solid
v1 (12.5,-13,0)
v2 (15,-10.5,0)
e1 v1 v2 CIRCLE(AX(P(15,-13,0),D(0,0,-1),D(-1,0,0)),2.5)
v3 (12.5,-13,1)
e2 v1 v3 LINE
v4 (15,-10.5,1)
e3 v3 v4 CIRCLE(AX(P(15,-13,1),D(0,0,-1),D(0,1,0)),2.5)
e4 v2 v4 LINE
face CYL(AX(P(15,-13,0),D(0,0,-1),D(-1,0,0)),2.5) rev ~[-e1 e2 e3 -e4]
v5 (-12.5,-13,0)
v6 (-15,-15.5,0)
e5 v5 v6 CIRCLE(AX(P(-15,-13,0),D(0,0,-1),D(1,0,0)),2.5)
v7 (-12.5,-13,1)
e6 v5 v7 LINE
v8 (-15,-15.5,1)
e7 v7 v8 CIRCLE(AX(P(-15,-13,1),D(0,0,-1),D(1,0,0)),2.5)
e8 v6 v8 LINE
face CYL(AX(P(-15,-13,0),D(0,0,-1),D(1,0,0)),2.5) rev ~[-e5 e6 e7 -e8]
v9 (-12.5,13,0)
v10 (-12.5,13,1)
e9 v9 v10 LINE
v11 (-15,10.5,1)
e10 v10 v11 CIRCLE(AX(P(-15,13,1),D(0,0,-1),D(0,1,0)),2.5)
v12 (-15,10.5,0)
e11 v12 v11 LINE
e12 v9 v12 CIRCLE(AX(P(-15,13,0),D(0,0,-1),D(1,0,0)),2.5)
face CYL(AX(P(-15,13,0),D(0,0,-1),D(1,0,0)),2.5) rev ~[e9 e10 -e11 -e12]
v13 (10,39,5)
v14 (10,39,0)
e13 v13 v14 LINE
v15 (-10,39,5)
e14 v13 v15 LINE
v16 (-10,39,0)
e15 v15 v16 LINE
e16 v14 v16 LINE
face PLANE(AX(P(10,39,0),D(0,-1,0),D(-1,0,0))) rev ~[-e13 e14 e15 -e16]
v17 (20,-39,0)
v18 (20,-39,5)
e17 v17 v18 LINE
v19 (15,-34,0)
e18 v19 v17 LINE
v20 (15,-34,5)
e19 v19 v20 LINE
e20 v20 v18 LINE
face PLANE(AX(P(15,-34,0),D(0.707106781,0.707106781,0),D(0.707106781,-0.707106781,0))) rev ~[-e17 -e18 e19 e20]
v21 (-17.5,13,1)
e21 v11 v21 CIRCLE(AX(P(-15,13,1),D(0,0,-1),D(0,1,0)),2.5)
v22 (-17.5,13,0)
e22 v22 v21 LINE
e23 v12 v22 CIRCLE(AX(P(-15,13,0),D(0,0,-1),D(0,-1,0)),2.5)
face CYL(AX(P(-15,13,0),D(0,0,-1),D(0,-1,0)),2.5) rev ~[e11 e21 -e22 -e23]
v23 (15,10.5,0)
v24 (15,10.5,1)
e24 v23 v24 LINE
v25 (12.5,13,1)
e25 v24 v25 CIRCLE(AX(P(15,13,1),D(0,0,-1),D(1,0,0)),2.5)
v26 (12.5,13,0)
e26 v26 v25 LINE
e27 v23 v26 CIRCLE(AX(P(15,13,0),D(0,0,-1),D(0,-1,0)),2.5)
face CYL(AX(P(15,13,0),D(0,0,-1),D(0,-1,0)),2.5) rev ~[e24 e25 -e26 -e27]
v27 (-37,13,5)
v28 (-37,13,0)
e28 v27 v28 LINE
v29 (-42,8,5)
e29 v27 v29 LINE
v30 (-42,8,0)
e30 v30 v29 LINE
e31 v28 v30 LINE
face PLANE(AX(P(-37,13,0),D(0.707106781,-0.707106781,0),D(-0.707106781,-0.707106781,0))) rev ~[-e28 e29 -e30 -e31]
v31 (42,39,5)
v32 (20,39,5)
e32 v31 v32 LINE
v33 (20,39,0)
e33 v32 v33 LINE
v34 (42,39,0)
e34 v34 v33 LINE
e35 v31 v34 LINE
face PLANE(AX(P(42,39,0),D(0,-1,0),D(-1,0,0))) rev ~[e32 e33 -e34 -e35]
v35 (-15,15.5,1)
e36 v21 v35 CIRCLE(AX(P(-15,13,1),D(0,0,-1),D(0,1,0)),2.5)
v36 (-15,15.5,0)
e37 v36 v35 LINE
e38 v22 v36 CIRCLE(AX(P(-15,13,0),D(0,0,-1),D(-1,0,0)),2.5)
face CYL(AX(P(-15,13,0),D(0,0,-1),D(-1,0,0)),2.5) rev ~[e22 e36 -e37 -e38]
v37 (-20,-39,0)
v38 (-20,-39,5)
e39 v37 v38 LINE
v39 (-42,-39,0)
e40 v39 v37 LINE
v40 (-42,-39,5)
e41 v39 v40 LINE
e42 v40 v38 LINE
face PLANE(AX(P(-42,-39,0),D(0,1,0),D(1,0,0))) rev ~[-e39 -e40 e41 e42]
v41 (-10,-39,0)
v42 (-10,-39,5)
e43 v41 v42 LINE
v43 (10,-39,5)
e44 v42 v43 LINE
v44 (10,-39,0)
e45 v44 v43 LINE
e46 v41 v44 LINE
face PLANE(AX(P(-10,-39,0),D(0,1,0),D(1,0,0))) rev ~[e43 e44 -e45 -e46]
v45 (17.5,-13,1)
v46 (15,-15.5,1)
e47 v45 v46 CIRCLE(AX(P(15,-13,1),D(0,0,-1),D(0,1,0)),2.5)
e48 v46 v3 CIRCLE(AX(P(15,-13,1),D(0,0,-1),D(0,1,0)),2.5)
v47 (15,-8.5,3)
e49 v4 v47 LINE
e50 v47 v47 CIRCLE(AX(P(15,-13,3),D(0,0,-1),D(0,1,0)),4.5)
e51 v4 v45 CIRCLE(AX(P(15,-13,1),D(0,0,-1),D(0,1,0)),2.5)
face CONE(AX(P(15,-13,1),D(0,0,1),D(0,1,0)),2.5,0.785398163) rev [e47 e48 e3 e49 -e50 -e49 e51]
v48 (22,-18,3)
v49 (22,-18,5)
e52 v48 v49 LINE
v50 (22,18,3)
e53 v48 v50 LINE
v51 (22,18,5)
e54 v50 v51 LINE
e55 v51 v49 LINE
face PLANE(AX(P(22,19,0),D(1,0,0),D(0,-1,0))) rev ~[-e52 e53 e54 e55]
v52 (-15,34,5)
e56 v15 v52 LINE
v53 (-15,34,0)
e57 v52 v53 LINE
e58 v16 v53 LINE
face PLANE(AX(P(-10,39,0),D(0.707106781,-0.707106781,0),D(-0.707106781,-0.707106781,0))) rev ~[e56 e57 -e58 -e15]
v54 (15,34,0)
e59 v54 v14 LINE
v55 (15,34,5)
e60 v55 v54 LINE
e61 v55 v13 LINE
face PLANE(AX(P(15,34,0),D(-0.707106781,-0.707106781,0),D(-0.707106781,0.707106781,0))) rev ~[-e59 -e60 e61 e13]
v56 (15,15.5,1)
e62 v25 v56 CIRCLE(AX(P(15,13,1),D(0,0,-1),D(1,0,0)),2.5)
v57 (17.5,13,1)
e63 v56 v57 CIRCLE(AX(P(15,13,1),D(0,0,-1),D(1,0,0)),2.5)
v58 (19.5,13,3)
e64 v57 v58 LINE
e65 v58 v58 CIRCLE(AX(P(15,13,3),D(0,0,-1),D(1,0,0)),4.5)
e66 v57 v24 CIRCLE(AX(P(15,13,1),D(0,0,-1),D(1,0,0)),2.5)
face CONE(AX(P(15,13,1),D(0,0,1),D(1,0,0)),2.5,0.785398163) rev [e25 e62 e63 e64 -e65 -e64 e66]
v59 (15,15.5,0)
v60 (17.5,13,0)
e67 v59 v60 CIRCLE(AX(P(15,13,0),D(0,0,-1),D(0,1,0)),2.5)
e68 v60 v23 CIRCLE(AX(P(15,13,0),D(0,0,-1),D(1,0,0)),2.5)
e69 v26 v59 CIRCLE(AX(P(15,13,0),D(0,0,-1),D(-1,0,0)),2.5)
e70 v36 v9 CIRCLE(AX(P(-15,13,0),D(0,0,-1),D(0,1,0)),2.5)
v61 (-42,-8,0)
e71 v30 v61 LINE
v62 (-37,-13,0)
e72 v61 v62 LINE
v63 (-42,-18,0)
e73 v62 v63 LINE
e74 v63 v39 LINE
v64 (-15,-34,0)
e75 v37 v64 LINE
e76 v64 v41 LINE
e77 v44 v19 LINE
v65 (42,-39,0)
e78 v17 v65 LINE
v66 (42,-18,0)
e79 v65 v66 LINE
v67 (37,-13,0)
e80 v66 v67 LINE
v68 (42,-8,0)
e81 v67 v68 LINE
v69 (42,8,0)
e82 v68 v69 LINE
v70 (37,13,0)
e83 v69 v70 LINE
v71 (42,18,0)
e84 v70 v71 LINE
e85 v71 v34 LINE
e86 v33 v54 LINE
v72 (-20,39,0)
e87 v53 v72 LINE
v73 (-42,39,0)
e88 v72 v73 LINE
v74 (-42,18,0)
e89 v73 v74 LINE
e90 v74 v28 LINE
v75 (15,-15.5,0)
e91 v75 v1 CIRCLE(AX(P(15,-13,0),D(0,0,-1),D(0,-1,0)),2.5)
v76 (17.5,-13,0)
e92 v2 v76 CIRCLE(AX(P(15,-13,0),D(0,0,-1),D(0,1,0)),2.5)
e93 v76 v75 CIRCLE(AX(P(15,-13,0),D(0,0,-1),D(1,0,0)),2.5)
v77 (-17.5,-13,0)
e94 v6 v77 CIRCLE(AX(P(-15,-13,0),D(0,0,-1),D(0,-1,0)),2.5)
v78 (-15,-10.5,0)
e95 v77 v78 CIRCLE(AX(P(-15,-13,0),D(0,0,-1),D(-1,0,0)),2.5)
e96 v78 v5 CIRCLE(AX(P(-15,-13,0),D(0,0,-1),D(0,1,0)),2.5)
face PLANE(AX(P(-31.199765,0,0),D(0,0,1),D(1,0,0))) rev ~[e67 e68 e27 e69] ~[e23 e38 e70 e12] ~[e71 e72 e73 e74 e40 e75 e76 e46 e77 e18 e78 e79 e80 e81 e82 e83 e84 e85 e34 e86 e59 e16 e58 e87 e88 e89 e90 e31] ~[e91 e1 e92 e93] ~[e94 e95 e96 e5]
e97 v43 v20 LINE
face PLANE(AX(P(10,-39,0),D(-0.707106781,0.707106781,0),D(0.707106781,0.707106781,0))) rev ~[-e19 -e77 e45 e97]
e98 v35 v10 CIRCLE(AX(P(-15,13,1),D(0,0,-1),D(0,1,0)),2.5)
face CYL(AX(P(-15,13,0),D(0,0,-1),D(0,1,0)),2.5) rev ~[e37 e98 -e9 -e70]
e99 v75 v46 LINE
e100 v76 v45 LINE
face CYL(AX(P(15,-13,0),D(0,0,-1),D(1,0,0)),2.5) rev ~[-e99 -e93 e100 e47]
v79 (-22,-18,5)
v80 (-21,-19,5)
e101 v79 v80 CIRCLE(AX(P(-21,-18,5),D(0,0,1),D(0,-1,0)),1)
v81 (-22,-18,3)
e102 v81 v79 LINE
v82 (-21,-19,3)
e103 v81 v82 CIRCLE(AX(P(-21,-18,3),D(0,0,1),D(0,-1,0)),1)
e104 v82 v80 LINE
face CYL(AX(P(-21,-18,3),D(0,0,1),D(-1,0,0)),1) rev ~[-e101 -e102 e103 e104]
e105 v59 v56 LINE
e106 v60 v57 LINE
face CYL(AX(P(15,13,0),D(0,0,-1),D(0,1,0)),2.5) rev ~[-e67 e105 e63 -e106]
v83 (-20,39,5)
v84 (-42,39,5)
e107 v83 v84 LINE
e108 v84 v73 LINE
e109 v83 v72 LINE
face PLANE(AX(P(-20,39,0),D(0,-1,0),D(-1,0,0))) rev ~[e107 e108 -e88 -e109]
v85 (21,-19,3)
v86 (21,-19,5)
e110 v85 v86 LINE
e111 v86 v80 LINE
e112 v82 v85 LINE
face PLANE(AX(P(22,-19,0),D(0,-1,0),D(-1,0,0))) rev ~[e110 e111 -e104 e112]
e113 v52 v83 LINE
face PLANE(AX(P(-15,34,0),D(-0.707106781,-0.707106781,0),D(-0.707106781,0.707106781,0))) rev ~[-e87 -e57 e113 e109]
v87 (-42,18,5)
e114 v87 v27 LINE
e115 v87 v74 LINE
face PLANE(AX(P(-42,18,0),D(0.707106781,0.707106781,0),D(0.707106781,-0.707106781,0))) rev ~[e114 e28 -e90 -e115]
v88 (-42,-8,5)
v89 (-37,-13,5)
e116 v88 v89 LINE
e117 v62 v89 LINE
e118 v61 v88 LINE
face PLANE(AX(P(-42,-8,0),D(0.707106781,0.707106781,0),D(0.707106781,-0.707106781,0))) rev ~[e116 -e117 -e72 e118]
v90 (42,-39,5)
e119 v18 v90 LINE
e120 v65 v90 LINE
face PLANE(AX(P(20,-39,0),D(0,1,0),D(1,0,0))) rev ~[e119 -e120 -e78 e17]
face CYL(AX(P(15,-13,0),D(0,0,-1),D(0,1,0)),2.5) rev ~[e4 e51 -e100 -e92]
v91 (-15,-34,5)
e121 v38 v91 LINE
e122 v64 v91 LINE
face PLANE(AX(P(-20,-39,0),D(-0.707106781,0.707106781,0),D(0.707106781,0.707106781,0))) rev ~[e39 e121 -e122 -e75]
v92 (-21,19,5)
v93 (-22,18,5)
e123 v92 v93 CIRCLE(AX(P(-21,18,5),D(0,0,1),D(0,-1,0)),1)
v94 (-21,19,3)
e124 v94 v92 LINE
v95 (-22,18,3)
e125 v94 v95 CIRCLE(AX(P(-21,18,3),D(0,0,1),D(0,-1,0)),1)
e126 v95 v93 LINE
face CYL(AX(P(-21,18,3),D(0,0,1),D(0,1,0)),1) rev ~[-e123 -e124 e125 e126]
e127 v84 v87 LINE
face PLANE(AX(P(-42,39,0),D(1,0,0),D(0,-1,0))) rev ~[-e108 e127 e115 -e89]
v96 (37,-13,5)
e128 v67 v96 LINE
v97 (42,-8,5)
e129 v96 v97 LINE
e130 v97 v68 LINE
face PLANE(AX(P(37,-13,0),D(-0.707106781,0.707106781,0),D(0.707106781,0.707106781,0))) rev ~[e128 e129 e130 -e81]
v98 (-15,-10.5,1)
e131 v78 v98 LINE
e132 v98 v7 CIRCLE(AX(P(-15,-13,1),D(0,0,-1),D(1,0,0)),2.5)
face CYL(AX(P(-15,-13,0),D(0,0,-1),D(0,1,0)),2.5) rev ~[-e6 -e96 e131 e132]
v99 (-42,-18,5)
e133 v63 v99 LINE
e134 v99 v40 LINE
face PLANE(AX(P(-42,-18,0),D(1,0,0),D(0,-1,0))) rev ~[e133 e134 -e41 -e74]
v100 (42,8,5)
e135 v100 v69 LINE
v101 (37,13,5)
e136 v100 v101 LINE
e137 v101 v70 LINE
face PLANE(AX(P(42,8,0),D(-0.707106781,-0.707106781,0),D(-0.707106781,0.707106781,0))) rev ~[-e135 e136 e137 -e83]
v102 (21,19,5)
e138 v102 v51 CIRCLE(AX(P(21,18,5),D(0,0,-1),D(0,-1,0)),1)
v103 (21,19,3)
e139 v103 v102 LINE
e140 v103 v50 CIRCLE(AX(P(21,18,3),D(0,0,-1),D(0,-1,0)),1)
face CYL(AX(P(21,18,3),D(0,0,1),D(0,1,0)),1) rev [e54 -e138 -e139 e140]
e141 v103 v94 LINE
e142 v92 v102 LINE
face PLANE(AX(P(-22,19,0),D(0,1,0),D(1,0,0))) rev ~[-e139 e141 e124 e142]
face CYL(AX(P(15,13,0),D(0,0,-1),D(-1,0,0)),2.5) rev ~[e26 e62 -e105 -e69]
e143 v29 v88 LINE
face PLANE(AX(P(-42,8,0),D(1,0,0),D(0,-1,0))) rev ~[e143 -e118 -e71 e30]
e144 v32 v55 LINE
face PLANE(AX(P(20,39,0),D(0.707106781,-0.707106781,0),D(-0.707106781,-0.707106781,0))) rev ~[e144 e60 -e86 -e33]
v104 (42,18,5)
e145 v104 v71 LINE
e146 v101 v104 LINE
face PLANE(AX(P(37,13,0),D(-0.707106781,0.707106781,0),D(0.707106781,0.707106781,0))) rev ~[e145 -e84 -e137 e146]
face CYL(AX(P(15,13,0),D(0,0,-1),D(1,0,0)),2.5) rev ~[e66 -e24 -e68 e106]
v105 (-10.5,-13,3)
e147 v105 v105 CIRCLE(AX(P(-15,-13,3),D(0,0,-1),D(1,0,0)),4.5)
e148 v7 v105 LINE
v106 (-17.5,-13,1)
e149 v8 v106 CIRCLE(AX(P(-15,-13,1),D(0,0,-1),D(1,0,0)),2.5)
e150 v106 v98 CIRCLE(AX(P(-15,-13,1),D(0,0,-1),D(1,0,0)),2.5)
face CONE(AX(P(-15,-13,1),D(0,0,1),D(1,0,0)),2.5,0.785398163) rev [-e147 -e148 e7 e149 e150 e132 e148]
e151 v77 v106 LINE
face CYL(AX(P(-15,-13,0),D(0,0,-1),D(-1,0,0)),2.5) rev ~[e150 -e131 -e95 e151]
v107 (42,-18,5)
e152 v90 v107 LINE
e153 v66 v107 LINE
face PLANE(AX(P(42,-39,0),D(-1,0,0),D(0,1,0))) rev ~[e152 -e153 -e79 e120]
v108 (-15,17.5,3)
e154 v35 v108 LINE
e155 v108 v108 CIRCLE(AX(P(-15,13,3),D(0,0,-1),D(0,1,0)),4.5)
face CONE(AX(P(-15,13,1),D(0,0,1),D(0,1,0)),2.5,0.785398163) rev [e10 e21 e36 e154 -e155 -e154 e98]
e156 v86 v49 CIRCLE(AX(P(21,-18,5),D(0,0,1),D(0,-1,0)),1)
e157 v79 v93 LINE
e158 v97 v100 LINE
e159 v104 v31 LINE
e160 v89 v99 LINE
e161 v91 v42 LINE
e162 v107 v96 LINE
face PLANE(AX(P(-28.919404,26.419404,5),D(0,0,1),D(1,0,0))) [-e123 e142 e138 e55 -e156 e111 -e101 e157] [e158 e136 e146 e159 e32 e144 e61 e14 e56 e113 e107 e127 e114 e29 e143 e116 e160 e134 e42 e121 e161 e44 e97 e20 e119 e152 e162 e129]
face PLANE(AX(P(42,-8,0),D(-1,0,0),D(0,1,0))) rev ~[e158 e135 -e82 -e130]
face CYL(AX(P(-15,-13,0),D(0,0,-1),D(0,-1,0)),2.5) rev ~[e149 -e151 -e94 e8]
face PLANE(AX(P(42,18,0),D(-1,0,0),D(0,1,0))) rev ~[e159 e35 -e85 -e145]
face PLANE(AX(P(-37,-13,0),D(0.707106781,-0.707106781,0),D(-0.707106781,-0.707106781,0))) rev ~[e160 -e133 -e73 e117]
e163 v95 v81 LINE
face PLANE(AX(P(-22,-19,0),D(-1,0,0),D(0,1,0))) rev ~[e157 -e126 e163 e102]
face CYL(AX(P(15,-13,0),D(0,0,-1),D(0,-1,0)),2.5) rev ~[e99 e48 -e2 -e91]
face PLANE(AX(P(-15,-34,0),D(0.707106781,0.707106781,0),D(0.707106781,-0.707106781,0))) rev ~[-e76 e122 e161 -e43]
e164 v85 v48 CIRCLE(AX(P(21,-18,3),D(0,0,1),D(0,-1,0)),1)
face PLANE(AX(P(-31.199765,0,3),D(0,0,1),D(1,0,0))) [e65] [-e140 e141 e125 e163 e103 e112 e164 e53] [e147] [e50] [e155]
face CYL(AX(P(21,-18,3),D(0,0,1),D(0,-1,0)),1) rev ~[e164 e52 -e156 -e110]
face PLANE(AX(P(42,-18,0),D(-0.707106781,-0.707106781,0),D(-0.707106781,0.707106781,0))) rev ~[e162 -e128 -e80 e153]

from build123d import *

# Parameters (mm, degrees)
F1_DEPTH = 3
F4_DEPTH = 5
F5_R     = 1


# Not quite as in the source:
# - a fillet or chamfer that OpenCascade refuses, or shapes differently, is made with other operations: its cross-section is extruded or revolved along the edge and cut away or added
# - a feature of the source that left no trace in its solid (it failed there, or was rolled back) is left out


with BuildPart() as f1:
    # F0 (on Top) → F1 (new body)
    with BuildSketch(Plane.XY):
        Polygon((-22, -13), (-22, 13), (-37, 13), (-42, 8), (-42, -8), (-37, -13), align=None)
        with BuildLine():
            Line((-15, -10.5), (-15, 10.5))
            ThreePointArc((-15, 10.5), (-16.767766953, 11.232233047), (-17.5, 13))
            Line((-17.5, 13), (-22, 13))
            Line((-22, 13), (-22, -13))
            Line((-22, -13), (-17.5, -13))
            ThreePointArc((-17.5, -13), (-16.767766953, -11.232233047), (-15, -10.5))
        make_face()
        Polygon((37, 13), (22, 13), (22, -13), (37, -13), (42, -8), (42, 8), align=None)
        with BuildLine():
            Line((15, 19), (15, 15.5))
            ThreePointArc((15, 15.5), (16.767766953, 14.767766953), (17.5, 13))
            Line((17.5, 13), (22, 13))
            Line((22, 13), (22, 19))
            Line((22, 19), (15, 19))
        make_face()
        with BuildLine():
            Line((22, -13), (17.5, -13))
            ThreePointArc((17.5, -13), (16.767766953, -14.767766953), (15, -15.5))
            Line((15, -15.5), (15, -19))
            Line((15, -19), (22, -19))
            Line((22, -19), (22, -13))
        make_face()
        with BuildLine():
            Line((12.5, 13), (-12.5, 13))
            ThreePointArc((-12.5, 13), (-13.232233047, 11.232233047), (-15, 10.5))
            Line((-15, 10.5), (-15, -10.5))
            ThreePointArc((-15, -10.5), (-13.232233047, -11.232233047), (-12.5, -13))
            Line((-12.5, -13), (12.5, -13))
            ThreePointArc((12.5, -13), (13.232233047, -11.232233047), (15, -10.5))
            Line((15, -10.5), (15, 10.5))
            ThreePointArc((15, 10.5), (13.232233047, 11.232233047), (12.5, 13))
        make_face()
        with BuildLine():
            ThreePointArc((-15, -15.5), (-16.767766953, -14.767766953), (-17.5, -13))
            Line((-17.5, -13), (-22, -13))
            Line((-22, -13), (-22, -19))
            Line((-22, -19), (-15, -19))
            Line((-15, -19), (-15, -15.5))
        make_face()
        Polygon((-15, 34), (-15, 19), (15, 19), (15, 34), (10, 39), (-10, 39), align=None)
        Polygon((15, -19), (-15, -19), (-15, -34), (-10, -39), (10, -39), (15, -34), align=None)
        Polygon((-22, -19), (-22, -13), (-37, -13), (-42, -18), (-42, -39), (-20, -39), (-15, -34), (-15, -19), align=None)
        Polygon((-22, 19), (-15, 19), (-15, 34), (-20, 39), (-42, 39), (-42, 18), (-37, 13), (-22, 13), align=None)
        Polygon((15, 34), (15, 19), (22, 19), (22, 13), (37, 13), (42, 18), (42, 39), (20, 39), align=None)
        Polygon((37, -13), (22, -13), (22, -19), (15, -19), (15, -34), (20, -39), (42, -39), (42, -18), align=None)
        with BuildLine():
            ThreePointArc((-17.5, 13), (-16.767766953, 14.767766953), (-15, 15.5))
            Line((-15, 15.5), (-15, 19))
            Line((-15, 19), (-22, 19))
            Line((-22, 19), (-22, 13))
            Line((-22, 13), (-17.5, 13))
        make_face()
        with BuildLine():
            Line((12.5, -13), (-12.5, -13))
            ThreePointArc((-12.5, -13), (-13.232233047, -14.767766953), (-15, -15.5))
            Line((-15, -15.5), (-15, -19))
            Line((-15, -19), (15, -19))
            Line((15, -19), (15, -15.5))
            ThreePointArc((15, -15.5), (13.232233047, -14.767766953), (12.5, -13))
        make_face()
        with BuildLine():
            ThreePointArc((-15, 15.5), (-13.232233047, 14.767766953), (-12.5, 13))
            Line((-12.5, 13), (12.5, 13))
            ThreePointArc((12.5, 13), (13.232233047, 14.767766953), (15, 15.5))
            Line((15, 15.5), (15, 19))
            Line((15, 19), (-15, 19))
            Line((-15, 19), (-15, 15.5))
        make_face()
        with BuildLine():
            ThreePointArc((17.5, 13), (16.767766953, 11.232233047), (15, 10.5))
            Line((15, 10.5), (15, -10.5))
            ThreePointArc((15, -10.5), (16.767766953, -11.232233047), (17.5, -13))
            Line((17.5, -13), (22, -13))
            Line((22, -13), (22, 13))
            Line((22, 13), (17.5, 13))
        make_face()
    extrude(amount=F1_DEPTH)

    # F2: chamfer of 2 on 4 edges, made by hand

    # F2_s1 → F2_t2 (revolve, cut)
    with BuildSketch(Plane.XZ.offset(13)):
        Polygon((-12.5, 1), (-10.5, 3), (-12.5, 3), align=None)
    revolve(axis=Axis((-15, -13, 3), (0, 0, -1)), mode=Mode.SUBTRACT)

    # F2_s3 → F2_t4 (revolve, cut)
    with BuildSketch(Plane.YZ.offset(-15)):
        Polygon((15.5, 1), (17.5, 3), (15.5, 3), align=None)
    revolve(axis=Axis((-15, 13, 3), (0, 0, -1)), mode=Mode.SUBTRACT)

    # F2_s5 → F2_t6 (revolve, cut)
    with BuildSketch(Plane.XZ.offset(-13)):
        Polygon((17.5, 1), (19.5, 3), (17.5, 3), align=None)
    revolve(axis=Axis((15, 13, 3), (0, 0, -1)), mode=Mode.SUBTRACT)

    # F2_s7 → F2_t8 (revolve, cut)
    with BuildSketch(Plane.YZ.offset(15)):
        Polygon((-10.5, 1), (-8.5, 3), (-10.5, 3), align=None)
    revolve(axis=Axis((15, -13, 3), (0, 0, -1)), mode=Mode.SUBTRACT)

    # F0 (on Top) → F4 (join)
    with BuildSketch(Plane.XY):
        Polygon((-22, 19), (-15, 19), (-15, 34), (-20, 39), (-42, 39), (-42, 18), (-37, 13), (-22, 13), align=None)
        Polygon((-22, -13), (-22, 13), (-37, 13), (-42, 8), (-42, -8), (-37, -13), align=None)
        Polygon((-22, -19), (-22, -13), (-37, -13), (-42, -18), (-42, -39), (-20, -39), (-15, -34), (-15, -19), align=None)
        Polygon((15, -19), (-15, -19), (-15, -34), (-10, -39), (10, -39), (15, -34), align=None)
        Polygon((37, -13), (22, -13), (22, -19), (15, -19), (15, -34), (20, -39), (42, -39), (42, -18), align=None)
        Polygon((37, 13), (22, 13), (22, -13), (37, -13), (42, -8), (42, 8), align=None)
        Polygon((15, 34), (15, 19), (22, 19), (22, 13), (37, 13), (42, 18), (42, 39), (20, 39), align=None)
        Polygon((-15, 34), (-15, 19), (15, 19), (15, 34), (10, 39), (-10, 39), align=None)
    extrude(amount=F4_DEPTH)

    # F5
    f5_edges = [f1.edges().sort_by_distance(p)[0] for p in [
        (-22, 19, 4),
        (-22, -19, 4),
        (22, 19, 4),
        (22, -19, 4),
    ]]
    fillet(f5_edges, radius=F5_R)


solid = f1.part
